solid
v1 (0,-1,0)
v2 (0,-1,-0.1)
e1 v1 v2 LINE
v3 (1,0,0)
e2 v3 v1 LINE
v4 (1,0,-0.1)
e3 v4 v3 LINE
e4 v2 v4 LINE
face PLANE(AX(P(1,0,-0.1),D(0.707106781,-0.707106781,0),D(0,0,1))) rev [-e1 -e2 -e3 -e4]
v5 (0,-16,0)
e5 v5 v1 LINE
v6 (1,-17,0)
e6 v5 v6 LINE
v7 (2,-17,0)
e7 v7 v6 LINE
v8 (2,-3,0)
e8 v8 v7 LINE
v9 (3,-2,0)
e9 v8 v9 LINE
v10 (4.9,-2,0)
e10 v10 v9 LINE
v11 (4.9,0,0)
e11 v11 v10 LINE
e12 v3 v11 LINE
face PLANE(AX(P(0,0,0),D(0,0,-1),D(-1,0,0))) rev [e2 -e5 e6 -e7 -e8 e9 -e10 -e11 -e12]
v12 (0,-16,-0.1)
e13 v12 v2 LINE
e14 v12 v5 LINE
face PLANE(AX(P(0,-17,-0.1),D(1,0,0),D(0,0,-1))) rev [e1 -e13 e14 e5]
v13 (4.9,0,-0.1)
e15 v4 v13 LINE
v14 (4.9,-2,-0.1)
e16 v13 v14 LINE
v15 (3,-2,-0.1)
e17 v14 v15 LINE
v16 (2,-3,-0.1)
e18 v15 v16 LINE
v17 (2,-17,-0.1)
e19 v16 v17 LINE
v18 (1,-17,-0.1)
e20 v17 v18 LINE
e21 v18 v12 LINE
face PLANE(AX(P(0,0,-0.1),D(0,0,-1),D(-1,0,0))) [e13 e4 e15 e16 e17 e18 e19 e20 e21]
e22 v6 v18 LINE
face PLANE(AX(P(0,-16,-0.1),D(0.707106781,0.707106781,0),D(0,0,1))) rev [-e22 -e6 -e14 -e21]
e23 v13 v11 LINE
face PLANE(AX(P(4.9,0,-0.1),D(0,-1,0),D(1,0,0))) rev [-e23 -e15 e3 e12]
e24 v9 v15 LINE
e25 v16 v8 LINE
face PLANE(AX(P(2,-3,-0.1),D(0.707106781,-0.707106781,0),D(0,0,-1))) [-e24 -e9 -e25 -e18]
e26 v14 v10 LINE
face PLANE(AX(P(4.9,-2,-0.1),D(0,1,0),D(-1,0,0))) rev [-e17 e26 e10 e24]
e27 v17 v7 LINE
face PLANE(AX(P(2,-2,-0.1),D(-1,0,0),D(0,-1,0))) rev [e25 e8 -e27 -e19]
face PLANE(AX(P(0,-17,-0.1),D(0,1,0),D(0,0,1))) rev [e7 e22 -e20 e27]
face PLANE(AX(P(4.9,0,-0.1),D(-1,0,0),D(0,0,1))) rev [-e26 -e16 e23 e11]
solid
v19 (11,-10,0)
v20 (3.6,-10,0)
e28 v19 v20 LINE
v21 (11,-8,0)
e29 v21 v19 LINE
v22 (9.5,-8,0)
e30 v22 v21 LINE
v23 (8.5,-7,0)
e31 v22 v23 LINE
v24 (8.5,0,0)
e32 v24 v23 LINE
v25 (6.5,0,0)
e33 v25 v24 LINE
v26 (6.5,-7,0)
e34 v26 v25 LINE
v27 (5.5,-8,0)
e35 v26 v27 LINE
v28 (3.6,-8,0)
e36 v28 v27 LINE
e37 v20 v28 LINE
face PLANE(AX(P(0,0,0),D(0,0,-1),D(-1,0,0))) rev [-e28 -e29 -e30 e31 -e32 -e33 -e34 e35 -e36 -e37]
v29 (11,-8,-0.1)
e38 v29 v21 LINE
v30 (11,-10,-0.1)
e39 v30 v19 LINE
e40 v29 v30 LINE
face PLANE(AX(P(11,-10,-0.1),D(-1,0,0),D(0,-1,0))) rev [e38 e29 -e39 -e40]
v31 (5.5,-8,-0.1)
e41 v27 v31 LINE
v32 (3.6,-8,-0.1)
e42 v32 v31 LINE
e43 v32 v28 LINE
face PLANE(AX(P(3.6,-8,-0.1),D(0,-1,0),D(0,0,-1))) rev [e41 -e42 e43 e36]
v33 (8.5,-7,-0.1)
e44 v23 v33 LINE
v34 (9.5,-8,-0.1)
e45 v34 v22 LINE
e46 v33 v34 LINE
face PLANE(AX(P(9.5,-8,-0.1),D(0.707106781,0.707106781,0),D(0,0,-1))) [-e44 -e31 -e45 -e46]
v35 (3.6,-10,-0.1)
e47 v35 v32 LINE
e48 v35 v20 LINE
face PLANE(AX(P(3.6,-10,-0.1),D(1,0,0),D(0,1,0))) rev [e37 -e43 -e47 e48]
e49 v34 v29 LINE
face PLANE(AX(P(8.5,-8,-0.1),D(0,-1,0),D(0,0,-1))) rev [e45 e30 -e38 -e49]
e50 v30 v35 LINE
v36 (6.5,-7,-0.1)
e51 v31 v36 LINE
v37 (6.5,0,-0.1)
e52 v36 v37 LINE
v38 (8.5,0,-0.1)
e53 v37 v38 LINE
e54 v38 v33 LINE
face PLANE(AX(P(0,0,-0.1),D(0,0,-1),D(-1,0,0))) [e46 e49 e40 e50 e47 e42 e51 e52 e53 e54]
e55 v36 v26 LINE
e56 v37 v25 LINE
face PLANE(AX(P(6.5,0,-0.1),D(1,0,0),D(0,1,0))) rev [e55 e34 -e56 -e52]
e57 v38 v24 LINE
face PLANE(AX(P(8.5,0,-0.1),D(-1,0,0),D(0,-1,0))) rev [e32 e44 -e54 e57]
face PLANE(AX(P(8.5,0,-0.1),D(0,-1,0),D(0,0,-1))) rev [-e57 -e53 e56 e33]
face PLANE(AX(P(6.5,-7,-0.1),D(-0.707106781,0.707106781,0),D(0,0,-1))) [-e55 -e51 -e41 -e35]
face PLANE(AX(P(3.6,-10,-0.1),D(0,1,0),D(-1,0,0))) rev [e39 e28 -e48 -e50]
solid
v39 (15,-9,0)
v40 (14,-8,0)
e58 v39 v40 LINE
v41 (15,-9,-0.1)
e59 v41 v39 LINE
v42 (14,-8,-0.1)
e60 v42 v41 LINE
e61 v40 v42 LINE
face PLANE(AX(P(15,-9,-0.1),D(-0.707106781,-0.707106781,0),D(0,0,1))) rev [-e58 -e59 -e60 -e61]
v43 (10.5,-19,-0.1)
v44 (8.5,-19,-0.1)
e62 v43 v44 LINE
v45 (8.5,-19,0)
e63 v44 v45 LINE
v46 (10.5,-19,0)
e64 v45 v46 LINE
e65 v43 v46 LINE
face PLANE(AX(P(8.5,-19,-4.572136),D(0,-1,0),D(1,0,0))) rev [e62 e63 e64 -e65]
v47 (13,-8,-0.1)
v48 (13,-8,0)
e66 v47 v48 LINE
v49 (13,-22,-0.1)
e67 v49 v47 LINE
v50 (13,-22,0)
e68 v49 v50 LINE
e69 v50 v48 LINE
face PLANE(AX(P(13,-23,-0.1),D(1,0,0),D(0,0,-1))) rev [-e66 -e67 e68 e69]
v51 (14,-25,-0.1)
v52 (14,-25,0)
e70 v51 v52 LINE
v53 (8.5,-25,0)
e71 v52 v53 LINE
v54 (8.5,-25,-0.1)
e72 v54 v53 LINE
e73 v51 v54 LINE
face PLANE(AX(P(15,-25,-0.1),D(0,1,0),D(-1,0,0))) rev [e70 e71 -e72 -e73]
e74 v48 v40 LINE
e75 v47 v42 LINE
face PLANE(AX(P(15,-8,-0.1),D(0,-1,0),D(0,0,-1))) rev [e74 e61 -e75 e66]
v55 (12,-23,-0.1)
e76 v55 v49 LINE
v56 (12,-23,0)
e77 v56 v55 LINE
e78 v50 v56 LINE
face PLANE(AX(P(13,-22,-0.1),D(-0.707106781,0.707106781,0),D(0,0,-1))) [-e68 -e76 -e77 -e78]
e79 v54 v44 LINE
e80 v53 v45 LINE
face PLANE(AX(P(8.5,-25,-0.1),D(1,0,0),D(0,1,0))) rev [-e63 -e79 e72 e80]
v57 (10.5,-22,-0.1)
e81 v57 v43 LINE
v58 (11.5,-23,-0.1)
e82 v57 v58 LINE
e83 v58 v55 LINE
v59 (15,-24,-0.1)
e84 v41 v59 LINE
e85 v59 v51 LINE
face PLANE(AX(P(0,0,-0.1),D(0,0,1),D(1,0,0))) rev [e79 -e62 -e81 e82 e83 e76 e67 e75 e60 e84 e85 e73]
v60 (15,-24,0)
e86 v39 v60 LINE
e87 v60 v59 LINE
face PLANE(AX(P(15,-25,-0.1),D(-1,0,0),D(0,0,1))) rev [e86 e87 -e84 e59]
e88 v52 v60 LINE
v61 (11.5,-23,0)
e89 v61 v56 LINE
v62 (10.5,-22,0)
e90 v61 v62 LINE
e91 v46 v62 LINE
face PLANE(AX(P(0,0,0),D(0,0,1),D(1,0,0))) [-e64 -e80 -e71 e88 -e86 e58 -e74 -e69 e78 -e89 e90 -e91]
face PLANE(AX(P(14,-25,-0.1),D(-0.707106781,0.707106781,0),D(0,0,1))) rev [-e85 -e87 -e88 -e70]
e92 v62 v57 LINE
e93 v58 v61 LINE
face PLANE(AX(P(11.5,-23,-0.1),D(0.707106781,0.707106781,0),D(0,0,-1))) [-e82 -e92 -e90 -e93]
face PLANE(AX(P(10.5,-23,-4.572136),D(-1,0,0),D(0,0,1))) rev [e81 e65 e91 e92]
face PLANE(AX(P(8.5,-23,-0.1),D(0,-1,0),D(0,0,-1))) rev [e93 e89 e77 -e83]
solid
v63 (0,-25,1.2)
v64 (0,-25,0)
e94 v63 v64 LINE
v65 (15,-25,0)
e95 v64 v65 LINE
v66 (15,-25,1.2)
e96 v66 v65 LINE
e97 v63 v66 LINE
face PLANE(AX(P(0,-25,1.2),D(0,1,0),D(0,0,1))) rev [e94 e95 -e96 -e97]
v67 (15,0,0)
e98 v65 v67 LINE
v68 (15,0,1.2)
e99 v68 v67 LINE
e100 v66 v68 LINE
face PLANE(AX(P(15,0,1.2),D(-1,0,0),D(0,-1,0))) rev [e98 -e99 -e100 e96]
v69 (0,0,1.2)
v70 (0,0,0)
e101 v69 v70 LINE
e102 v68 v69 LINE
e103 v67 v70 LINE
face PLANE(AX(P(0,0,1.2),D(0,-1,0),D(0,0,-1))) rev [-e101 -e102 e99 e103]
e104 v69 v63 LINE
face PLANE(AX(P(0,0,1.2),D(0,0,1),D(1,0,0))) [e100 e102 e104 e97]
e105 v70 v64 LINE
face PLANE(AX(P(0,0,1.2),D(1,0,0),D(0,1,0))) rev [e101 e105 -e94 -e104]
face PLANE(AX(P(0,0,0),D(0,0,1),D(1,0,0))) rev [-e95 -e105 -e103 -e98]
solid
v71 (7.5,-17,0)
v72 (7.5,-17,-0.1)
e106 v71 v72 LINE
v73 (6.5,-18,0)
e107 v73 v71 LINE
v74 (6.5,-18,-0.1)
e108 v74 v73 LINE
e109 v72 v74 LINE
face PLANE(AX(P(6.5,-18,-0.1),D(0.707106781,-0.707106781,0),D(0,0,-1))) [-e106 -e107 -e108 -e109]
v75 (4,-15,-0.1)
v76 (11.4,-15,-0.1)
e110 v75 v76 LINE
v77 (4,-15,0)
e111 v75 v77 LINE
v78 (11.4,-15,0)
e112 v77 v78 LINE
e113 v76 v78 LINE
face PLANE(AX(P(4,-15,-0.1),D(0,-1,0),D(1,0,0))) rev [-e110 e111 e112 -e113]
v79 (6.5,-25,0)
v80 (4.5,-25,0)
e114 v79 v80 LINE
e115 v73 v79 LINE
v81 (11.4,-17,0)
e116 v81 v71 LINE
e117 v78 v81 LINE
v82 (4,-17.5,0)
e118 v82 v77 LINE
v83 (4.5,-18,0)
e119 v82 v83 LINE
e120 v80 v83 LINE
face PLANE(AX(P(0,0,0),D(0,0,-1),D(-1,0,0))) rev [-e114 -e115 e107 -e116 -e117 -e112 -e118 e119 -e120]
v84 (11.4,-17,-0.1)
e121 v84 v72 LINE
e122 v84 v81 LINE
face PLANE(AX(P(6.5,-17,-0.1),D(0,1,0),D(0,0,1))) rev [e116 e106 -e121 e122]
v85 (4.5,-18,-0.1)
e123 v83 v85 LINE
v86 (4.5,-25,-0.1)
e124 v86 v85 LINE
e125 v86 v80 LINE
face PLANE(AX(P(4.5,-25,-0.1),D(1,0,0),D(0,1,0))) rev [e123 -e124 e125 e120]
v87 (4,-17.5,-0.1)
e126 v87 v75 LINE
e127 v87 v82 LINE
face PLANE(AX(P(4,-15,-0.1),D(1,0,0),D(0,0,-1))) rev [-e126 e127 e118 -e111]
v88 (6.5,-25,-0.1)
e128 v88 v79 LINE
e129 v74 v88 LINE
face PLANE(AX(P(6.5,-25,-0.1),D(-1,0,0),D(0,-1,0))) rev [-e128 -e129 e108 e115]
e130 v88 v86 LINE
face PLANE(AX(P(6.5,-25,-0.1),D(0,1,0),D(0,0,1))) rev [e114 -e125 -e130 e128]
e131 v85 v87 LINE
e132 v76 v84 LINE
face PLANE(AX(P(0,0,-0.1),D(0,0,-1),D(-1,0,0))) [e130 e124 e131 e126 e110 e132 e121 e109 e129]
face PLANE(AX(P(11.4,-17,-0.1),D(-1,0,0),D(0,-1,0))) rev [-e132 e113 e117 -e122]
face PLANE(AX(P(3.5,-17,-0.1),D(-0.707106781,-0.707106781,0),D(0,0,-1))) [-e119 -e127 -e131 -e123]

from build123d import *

# Parameters (mm, degrees)
SKETCH1_W             = 15
SKETCH1_H             = 25
BOSS_EXTRUDE1_DEPTH   = 1.2
BOSS_EXTRUDE2_DEPTH   = 0.1
BOSS_EXTRUDE2_2_DEPTH = 0.1
BOSS_EXTRUDE2_3_DEPTH = 0.1
BOSS_EXTRUDE2_4_DEPTH = 0.1
SKETCH3_W             = 2
SKETCH3_H             = 4
BOSS_EXTRUDE3_DEPTH   = 0.1
CHAMFER5_SIZE         = 1
CHAMFER6_SIZE         = 1
CHAMFER7_SIZE         = 1
CHAMFER8_SIZE         = 1


with BuildPart() as part:
    # Sketch1 → Boss-Extrude1 (new body)
    with BuildSketch(Plane.XY):
        with Locations((7.5, -12.5)):
            Rectangle(SKETCH1_W, SKETCH1_H)
    extrude(amount=BOSS_EXTRUDE1_DEPTH)


with BuildPart() as body_2:
    # Sketch2 → Boss-Extrude2 (new body)
    with BuildSketch(Plane(origin=(0, 0, 0), x_dir=(-1, 0, 0), z_dir=(0, 0, -1))):
        Polygon((-6.5, -17), (-11.4, -17), (-11.4, -15), (-4, -15), (-4, -17), (-4.5, -17), (-4.5, -25), (-6.5, -25), align=None)
    extrude(amount=BOSS_EXTRUDE2_DEPTH)

    # Chamfer6
    # the kernel refuses this chamfer: 1 mm, written as the material it adds along each edge
    with BuildSketch(Plane(origin=(6.5, -17, 0), x_dir=(0.9996219169112968, 0.027495876610585623, 0), z_dir=(0, 0, -1))) as chamfer6_piece_1:
        Polygon((CHAMFER6_SIZE * 0.999621916911, CHAMFER6_SIZE * 0.0274958766106), (-CHAMFER6_SIZE * 0.0274958766106, CHAMFER6_SIZE * 0.999621916911), (0, 0), align=None)
    extrude(amount=0.1)
    with BuildSketch(Plane(origin=(4.5, -17, 0), x_dir=(-0.9996219169112968, 0.027495876610585623, 0), z_dir=(0, 0, -1))) as chamfer6_piece_2_section:
        Polygon((CHAMFER6_SIZE * 0.999621916911, -CHAMFER6_SIZE * 0.0274958766106), (-CHAMFER6_SIZE * 0.0274958766106, -CHAMFER6_SIZE * 0.999621916911), (0, 0), align=None)
    chamfer6_piece_2 = extrude(amount=0.1, mode=Mode.PRIVATE)
    chamfer6_piece_2 = split(chamfer6_piece_2, bisect_by=Plane(origin=(4, -17.393401084, -0.05), z_dir=(1, 0, 0)), keep=Keep.TOP, mode=Mode.PRIVATE)
    add(chamfer6_piece_2)


with BuildPart() as body_3:
    # Sketch2 → Boss-Extrude2 2 (new body)
    with BuildSketch(Plane(origin=(0, 0, 0), x_dir=(-1, 0, 0), z_dir=(0, 0, -1))):
        Polygon((-4.9, 0), (0, 0), (0, -17), (-2, -17), (-2, -2), (-4.9, -2), align=None)
    extrude(amount=BOSS_EXTRUDE2_2_DEPTH)

    # Chamfer7
    chamfer7_edges = [body_3.edges().sort_by_distance(p)[0] for p in [
        (0, 0, -0.05),
        (0, -17, -0.05),
        (2, -2, -0.05),
    ]]
    chamfer(chamfer7_edges, length=CHAMFER7_SIZE)


with BuildPart() as body_4:
    # Sketch2 → Boss-Extrude2 3 (new body)
    with BuildSketch(Plane(origin=(0, 0, 0), x_dir=(-1, 0, 0), z_dir=(0, 0, -1))):
        Polygon((-8.5, 0), (-6.5, 0), (-6.5, -8), (-3.6, -8), (-3.6, -10), (-7.5, -10), (-11, -10), (-11, -8), (-8.5, -8), align=None)
    extrude(amount=BOSS_EXTRUDE2_3_DEPTH)

    # Chamfer8
    chamfer8_edges = [body_4.edges().sort_by_distance(p)[0] for p in [
        (8.5, -8, -0.05),
        (6.5, -8, -0.05),
    ]]
    chamfer(chamfer8_edges, length=CHAMFER8_SIZE)


with BuildPart() as body_5:
    # Sketch2 → Boss-Extrude2 4 (new body)
    with BuildSketch(Plane(origin=(0, 0, 0), x_dir=(-1, 0, 0), z_dir=(0, 0, -1))):
        Polygon((-8.5, -25), (-8.5, -23), (-13, -23), (-13, -8), (-15, -8), (-15, -25), align=None)
    extrude(amount=BOSS_EXTRUDE2_4_DEPTH)

    # Sketch3 → Boss-Extrude3 (add)
    with BuildSketch(Plane(origin=(0, 0, 0), x_dir=(-1, 0, 0), z_dir=(0, 0, -1))):
        with Locations((-9.5, -21)):
            Rectangle(SKETCH3_W, SKETCH3_H)
    extrude(amount=BOSS_EXTRUDE3_DEPTH)

    # Chamfer5
    chamfer5_edges = [body_5.edges().sort_by_distance(p)[0] for p in [
        (13, -23, -0.05),
        (15, -25, -0.05),
        (15, -8, -0.05),
        (10.5, -23, -0.05),
    ]]
    chamfer(chamfer5_edges, length=CHAMFER5_SIZE)


solid = Compound([part.part, body_2.part, body_3.part, body_4.part, body_5.part])
